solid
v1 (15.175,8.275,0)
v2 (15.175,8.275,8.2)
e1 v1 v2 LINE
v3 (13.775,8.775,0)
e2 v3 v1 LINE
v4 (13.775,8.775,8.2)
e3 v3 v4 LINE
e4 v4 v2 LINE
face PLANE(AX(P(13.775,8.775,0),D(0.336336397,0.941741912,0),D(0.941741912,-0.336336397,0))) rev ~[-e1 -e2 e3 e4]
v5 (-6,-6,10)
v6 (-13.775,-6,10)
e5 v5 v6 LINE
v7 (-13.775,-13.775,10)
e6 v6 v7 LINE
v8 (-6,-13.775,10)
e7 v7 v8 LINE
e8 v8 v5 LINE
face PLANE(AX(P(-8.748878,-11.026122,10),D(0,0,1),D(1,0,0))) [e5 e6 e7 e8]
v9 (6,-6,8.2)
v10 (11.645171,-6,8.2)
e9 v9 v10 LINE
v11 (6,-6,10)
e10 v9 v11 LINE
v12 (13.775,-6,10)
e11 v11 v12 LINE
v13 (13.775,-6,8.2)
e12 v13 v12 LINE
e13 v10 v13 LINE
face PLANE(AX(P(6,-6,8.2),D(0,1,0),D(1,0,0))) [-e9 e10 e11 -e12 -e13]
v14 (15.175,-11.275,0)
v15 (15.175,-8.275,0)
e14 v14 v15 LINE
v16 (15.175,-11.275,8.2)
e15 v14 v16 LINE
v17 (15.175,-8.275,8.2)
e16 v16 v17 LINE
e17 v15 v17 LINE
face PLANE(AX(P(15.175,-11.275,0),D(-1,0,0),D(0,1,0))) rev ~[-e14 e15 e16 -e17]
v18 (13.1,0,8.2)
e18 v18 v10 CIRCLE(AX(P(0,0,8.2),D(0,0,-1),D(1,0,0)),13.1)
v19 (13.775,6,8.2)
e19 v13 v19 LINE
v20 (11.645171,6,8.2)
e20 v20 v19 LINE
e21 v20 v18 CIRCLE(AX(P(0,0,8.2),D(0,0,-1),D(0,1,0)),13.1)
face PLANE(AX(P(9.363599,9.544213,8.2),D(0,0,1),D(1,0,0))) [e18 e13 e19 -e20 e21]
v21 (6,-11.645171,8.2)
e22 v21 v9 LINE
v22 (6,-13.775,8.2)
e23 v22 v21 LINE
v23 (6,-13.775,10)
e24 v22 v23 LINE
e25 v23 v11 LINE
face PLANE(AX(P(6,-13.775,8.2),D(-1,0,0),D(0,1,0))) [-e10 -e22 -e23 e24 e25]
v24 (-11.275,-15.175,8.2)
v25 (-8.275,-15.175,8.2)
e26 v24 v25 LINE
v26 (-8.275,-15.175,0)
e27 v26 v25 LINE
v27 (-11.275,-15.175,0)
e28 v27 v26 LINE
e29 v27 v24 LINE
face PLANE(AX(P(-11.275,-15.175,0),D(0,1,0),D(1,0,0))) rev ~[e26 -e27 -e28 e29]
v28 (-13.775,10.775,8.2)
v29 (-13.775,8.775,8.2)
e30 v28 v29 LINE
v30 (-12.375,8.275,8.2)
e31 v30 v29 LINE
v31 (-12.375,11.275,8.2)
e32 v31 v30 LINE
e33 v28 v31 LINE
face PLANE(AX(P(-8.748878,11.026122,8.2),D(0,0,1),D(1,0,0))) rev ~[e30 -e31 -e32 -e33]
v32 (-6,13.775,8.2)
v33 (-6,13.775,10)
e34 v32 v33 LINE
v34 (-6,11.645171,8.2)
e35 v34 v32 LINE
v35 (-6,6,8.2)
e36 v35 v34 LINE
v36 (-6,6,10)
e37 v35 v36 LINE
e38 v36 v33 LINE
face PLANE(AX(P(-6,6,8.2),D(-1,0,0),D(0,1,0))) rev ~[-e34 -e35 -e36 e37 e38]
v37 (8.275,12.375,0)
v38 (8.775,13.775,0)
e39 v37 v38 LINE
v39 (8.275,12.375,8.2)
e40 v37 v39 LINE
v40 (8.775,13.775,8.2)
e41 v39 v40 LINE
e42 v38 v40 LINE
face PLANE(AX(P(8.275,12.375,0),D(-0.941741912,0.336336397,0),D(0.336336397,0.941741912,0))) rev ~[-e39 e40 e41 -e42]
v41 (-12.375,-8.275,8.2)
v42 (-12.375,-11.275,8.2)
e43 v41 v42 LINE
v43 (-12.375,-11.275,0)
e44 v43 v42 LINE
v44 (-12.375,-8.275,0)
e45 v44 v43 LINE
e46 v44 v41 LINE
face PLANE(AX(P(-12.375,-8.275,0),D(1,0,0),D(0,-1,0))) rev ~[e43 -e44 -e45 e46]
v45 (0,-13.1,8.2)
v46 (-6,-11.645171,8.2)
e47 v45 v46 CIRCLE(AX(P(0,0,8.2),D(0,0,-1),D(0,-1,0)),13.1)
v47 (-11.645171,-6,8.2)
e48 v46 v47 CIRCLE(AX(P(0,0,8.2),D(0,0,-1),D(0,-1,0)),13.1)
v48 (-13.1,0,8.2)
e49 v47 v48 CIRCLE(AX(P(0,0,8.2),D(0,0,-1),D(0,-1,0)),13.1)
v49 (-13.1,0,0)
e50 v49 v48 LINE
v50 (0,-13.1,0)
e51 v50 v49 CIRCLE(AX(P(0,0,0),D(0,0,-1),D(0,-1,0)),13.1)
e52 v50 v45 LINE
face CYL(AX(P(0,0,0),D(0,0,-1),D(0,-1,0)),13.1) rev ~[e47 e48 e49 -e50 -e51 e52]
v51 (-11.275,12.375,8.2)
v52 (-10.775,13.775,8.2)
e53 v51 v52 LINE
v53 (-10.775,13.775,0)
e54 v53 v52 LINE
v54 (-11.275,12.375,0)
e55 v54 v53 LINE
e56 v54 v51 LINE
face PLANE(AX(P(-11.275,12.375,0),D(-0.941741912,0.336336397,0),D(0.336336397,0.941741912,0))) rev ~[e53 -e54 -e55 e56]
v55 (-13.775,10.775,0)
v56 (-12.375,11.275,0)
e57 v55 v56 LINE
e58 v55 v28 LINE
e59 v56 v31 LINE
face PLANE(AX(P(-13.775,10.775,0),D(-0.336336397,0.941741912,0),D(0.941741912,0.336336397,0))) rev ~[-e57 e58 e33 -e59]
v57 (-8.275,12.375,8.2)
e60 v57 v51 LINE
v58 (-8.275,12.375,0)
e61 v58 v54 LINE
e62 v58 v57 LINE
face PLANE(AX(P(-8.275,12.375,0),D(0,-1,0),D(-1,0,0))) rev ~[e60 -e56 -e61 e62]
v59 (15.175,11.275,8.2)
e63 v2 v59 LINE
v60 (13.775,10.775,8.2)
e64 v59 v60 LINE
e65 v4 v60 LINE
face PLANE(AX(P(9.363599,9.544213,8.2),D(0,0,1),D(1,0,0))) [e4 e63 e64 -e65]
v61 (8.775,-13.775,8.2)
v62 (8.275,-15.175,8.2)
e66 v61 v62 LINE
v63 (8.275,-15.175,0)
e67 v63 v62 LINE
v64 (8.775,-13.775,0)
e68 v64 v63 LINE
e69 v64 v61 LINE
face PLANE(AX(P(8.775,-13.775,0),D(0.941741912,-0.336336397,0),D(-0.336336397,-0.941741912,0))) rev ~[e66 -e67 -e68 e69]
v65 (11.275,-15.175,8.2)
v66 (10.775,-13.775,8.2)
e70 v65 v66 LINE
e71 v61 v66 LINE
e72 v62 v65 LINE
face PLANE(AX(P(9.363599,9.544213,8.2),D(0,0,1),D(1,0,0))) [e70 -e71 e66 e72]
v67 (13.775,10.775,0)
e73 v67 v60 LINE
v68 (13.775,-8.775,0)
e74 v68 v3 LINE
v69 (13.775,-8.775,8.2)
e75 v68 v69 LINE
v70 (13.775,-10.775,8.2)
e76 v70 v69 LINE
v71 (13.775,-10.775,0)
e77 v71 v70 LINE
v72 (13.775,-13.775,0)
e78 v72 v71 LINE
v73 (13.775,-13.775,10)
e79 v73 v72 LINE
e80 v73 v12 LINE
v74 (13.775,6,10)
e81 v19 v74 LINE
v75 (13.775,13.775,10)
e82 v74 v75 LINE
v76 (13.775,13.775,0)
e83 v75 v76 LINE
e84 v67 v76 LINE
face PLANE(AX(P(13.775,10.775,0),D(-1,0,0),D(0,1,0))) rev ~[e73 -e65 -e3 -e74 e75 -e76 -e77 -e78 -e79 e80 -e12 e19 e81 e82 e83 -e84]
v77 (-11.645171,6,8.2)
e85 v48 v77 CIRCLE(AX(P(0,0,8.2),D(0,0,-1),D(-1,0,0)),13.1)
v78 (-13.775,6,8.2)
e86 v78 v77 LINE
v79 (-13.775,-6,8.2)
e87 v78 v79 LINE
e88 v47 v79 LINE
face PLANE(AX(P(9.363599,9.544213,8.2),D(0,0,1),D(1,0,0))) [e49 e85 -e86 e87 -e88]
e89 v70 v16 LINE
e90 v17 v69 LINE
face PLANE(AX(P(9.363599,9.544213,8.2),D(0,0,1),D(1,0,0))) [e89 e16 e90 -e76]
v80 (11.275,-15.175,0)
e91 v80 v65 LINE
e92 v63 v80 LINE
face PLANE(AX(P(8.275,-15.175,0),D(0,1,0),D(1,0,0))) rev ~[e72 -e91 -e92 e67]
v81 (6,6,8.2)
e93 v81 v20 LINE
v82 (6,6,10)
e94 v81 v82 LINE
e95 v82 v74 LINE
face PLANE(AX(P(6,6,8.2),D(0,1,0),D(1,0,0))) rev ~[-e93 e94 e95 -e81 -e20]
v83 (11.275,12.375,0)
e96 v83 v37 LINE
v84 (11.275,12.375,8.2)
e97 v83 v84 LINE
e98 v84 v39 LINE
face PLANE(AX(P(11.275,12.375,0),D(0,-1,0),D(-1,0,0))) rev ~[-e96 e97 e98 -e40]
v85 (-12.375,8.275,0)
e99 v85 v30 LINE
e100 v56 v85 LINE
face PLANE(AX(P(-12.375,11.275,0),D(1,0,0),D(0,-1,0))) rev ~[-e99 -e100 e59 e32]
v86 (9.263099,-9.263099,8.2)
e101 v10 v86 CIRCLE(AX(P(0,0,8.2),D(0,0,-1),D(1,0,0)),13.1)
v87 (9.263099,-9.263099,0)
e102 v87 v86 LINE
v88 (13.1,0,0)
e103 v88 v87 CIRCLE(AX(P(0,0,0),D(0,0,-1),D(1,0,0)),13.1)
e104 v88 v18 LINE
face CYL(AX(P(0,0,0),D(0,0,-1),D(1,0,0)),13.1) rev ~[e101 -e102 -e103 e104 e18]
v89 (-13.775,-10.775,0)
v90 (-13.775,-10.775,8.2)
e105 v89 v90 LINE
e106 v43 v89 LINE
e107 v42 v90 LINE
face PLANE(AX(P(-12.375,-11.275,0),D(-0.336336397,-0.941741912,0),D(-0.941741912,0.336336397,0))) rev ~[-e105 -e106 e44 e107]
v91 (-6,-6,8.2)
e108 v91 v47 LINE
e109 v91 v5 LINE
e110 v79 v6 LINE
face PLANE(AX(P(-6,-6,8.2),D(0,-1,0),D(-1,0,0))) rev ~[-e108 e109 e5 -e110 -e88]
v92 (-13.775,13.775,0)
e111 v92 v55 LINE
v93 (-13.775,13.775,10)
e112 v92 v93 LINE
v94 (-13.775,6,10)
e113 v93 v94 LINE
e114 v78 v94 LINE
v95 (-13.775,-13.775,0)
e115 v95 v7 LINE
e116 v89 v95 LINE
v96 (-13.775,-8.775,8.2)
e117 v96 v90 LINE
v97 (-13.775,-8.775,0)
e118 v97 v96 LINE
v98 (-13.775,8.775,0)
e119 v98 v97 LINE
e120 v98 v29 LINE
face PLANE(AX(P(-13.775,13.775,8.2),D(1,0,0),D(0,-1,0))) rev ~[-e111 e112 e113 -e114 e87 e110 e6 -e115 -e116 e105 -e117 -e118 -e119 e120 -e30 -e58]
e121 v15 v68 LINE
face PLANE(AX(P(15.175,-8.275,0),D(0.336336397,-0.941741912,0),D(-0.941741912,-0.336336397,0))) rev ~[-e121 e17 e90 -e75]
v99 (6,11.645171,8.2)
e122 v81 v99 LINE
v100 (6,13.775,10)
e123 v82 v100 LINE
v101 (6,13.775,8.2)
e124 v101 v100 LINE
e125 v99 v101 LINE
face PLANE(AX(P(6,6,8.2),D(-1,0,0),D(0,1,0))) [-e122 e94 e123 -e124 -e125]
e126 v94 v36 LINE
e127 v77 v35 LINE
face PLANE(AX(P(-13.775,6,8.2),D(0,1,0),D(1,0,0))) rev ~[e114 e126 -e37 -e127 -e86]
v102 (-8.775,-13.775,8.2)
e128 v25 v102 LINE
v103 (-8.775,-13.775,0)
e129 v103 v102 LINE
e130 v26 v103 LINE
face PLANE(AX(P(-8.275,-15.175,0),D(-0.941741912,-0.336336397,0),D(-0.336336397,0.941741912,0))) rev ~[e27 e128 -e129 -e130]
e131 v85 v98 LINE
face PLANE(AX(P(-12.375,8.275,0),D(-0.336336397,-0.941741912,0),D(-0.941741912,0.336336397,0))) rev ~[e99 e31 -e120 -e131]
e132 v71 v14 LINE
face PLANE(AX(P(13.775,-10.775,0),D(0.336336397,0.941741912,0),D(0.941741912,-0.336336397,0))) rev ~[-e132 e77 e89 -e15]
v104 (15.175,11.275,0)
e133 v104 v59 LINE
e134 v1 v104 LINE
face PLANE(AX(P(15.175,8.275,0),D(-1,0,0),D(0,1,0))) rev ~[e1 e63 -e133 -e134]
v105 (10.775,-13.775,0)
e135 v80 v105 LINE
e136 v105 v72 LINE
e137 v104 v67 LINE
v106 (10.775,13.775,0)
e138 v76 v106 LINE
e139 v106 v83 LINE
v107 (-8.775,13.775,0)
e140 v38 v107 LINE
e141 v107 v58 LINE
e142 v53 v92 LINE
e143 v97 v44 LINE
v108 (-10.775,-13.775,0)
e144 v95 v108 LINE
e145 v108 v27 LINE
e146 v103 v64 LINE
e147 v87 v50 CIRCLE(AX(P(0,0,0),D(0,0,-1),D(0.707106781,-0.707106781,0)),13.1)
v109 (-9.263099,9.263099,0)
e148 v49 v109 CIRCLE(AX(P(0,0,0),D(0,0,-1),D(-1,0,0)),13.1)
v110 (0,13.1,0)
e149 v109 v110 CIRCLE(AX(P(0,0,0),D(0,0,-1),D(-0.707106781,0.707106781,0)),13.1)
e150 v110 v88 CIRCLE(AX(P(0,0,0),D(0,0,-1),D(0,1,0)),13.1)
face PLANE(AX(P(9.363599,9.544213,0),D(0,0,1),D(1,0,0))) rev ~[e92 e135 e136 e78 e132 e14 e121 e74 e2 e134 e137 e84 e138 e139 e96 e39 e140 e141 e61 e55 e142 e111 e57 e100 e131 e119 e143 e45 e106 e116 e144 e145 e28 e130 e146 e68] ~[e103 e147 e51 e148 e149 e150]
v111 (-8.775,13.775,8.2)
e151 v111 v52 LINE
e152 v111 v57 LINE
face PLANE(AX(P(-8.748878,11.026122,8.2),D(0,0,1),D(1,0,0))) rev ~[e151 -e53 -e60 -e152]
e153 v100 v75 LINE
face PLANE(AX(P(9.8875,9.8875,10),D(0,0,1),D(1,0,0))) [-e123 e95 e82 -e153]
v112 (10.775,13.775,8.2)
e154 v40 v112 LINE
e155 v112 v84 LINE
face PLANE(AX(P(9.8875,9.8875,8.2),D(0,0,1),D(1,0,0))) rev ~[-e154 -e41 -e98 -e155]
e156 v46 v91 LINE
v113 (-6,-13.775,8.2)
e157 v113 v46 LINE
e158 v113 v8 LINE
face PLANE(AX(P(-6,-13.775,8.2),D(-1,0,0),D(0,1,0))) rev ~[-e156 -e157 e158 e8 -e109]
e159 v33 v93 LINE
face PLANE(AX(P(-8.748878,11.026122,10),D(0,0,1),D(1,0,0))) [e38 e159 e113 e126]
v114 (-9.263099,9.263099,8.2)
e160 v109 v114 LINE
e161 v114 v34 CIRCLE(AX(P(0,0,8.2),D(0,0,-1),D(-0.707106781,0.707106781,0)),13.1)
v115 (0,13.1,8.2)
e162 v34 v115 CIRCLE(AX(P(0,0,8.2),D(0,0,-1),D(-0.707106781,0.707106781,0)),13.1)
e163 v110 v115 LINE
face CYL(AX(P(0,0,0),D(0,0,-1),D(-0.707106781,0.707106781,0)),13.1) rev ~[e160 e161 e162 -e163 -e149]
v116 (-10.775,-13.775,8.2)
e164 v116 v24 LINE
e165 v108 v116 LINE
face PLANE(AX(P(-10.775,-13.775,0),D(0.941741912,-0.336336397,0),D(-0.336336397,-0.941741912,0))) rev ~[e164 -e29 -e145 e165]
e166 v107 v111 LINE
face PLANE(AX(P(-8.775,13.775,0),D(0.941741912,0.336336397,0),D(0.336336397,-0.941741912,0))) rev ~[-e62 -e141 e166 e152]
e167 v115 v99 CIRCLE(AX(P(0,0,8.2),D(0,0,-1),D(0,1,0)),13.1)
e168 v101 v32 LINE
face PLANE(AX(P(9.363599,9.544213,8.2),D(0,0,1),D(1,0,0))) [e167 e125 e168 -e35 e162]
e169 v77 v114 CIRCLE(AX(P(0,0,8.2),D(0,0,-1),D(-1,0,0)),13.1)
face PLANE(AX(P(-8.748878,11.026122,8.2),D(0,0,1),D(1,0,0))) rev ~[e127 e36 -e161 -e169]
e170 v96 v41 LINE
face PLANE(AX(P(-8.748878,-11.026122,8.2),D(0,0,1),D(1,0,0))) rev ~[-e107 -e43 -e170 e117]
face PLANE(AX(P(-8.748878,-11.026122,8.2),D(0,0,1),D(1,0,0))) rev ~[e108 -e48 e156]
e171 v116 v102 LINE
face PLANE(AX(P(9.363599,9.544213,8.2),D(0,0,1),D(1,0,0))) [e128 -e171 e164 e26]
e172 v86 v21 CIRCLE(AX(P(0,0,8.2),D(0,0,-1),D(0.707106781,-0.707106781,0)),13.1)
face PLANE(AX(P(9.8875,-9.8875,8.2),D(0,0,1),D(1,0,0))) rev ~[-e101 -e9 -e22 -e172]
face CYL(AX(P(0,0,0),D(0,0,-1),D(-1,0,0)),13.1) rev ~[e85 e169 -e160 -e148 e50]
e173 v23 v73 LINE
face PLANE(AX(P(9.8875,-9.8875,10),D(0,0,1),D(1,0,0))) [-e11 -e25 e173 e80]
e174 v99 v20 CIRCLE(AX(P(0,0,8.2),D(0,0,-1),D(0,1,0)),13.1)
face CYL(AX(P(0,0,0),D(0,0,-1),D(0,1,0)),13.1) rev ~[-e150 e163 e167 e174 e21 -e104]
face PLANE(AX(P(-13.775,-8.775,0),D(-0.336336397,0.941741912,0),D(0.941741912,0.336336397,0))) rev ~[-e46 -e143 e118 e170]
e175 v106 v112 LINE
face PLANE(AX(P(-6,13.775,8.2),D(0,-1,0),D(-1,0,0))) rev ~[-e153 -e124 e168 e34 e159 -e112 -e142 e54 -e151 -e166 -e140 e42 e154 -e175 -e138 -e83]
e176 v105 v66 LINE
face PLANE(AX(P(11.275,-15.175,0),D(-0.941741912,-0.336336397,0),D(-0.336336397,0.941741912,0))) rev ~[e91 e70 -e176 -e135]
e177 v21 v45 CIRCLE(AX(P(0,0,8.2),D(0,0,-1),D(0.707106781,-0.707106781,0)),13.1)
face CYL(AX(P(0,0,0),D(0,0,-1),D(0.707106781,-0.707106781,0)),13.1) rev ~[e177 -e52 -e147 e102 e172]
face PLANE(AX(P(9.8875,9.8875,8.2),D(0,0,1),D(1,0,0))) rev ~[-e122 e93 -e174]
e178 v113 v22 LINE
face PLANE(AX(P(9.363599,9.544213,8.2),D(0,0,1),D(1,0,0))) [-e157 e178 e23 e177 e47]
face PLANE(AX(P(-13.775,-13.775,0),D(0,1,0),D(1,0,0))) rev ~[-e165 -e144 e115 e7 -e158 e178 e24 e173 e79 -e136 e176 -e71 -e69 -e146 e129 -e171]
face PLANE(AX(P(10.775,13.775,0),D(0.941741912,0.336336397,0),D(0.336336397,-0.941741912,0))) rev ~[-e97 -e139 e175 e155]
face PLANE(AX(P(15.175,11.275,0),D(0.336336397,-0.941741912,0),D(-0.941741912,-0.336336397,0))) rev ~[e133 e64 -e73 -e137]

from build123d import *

# Parameters (mm, degrees)
F1_DEPTH = 8.2
F2_W     = 7.775
F2_H     = 7.775
F3_DEPTH = 1.8


# Not quite as in the source:
# - a feature names something its author has since deleted; it is built from what else it names


with BuildPart() as f1:
    # F0 (on Top) → F1 (new body)
    with BuildSketch(Plane.XY):
        with BuildLine():
            Line((13.775, 10.775), (13.775, 13.775))
            Line((13.775, 13.775), (10.775, 13.775))
            Line((10.775, 13.775), (11.275, 12.375))
            Line((11.275, 12.375), (8.275, 12.375))
            Line((8.275, 12.375), (8.775, 13.775))
            Line((8.775, 13.775), (0, 13.775))
            Line((0, 13.775), (0, 13.1))
            ThreePointArc((0, 13.1), (9.2630988335, 9.2630988335), (13.1, 0))
            Line((13.1, 0), (13.775, 0))
            Line((13.775, 0), (13.775, 8.775))
            Line((13.775, 8.775), (13.775, 10.775))
        make_face()
        Polygon((15.175, 11.275), (13.775, 10.775), (13.775, 8.775), (15.175, 8.275), align=None)
        Polygon((15.175, -8.275), (13.775, -8.775), (13.775, -10.775), (15.175, -11.275), align=None)
        with BuildLine():
            Line((13.775, -8.775), (13.775, 0))
            Line((13.775, 0), (13.1, 0))
            ThreePointArc((13.1, 0), (12.1028218759, -5.013152964), (9.2630988335, -9.2630988335))
            Line((9.2630988335, -9.2630988335), (13.775, -13.775))
            Line((13.775, -13.775), (13.775, -10.775))
            Line((13.775, -10.775), (13.775, -8.775))
        make_face()
        with BuildLine():
            Line((13.775, -13.775), (9.2630988335, -9.2630988335))
            ThreePointArc((9.2630988335, -9.2630988335), (5.013152964, -12.1028218759), (0, -13.1))
            Line((0, -13.1), (0, -13.775))
            Line((0, -13.775), (8.775, -13.775))
            Line((8.775, -13.775), (10.775, -13.775))
            Line((10.775, -13.775), (13.775, -13.775))
        make_face()
        Polygon((11.275, -15.175), (10.775, -13.775), (8.775, -13.775), (8.275, -15.175), align=None)
        with BuildLine():
            ThreePointArc((0, -13.1), (-9.2630988335, -9.2630988335), (-13.1, 0))
            Line((-13.1, 0), (-13.775, 0))
            Line((-13.775, 0), (-13.775, -8.775))
            Line((-13.775, -8.775), (-12.375, -8.275))
            Line((-12.375, -8.275), (-12.375, -11.275))
            Line((-12.375, -11.275), (-13.775, -10.775))
            Line((-13.775, -10.775), (-13.775, -13.775))
            Line((-13.775, -13.775), (-10.775, -13.775))
            Line((-10.775, -13.775), (-8.775, -13.775))
            Line((-8.775, -13.775), (0, -13.775))
            Line((0, -13.775), (0, -13.1))
        make_face()
        Polygon((-8.275, -15.175), (-8.775, -13.775), (-10.775, -13.775), (-11.275, -15.175), align=None)
        with BuildLine():
            ThreePointArc((-13.1, 0), (-12.1028218759, 5.013152964), (-9.2630988335, 9.2630988335))
            Line((-9.2630988335, 9.2630988335), (-13.775, 13.775))
            Line((-13.775, 13.775), (-13.775, 10.775))
            Line((-13.775, 10.775), (-12.375, 11.275))
            Line((-12.375, 11.275), (-12.375, 8.275))
            Line((-12.375, 8.275), (-13.775, 8.775))
            Line((-13.775, 8.775), (-13.775, 0))
            Line((-13.775, 0), (-13.1, 0))
        make_face()
        with BuildLine():
            Line((0, 13.1), (0, 13.775))
            Line((0, 13.775), (-8.775, 13.775))
            Line((-8.775, 13.775), (-8.275, 12.375))
            Line((-8.275, 12.375), (-9.775, 12.375))
            Line((-9.775, 12.375), (-11.275, 12.375))
            Line((-11.275, 12.375), (-10.775, 13.775))
            Line((-10.775, 13.775), (-13.775, 13.775))
            Line((-13.775, 13.775), (-9.2630988335, 9.2630988335))
            ThreePointArc((-9.2630988335, 9.2630988335), (-5.013152964, 12.1028218759), (0, 13.1))
        make_face()
    extrude(amount=F1_DEPTH)

    # F2 (on face) → F3 (join)
    with BuildSketch(Plane.XY.offset(8.2)):
        Polygon((-6, 13.775), (-13.775, 13.775), (-6, 6), align=None)
        Polygon((-6, -13.775), (-6, -6), (-13.775, -13.775), align=None)
        Polygon((-13.775, -13.775), (-6, -6), (-13.775, -6), align=None)
        Polygon((-6, 6), (-13.775, 13.775), (-13.775, 6), align=None)
        with Locations((9.8875, -9.8875)):
            Rectangle(F2_W, F2_H)
        with Locations((9.8875, 9.8875)):
            Rectangle(F2_W, F2_H)
    extrude(amount=F3_DEPTH)


solid = f1.part
